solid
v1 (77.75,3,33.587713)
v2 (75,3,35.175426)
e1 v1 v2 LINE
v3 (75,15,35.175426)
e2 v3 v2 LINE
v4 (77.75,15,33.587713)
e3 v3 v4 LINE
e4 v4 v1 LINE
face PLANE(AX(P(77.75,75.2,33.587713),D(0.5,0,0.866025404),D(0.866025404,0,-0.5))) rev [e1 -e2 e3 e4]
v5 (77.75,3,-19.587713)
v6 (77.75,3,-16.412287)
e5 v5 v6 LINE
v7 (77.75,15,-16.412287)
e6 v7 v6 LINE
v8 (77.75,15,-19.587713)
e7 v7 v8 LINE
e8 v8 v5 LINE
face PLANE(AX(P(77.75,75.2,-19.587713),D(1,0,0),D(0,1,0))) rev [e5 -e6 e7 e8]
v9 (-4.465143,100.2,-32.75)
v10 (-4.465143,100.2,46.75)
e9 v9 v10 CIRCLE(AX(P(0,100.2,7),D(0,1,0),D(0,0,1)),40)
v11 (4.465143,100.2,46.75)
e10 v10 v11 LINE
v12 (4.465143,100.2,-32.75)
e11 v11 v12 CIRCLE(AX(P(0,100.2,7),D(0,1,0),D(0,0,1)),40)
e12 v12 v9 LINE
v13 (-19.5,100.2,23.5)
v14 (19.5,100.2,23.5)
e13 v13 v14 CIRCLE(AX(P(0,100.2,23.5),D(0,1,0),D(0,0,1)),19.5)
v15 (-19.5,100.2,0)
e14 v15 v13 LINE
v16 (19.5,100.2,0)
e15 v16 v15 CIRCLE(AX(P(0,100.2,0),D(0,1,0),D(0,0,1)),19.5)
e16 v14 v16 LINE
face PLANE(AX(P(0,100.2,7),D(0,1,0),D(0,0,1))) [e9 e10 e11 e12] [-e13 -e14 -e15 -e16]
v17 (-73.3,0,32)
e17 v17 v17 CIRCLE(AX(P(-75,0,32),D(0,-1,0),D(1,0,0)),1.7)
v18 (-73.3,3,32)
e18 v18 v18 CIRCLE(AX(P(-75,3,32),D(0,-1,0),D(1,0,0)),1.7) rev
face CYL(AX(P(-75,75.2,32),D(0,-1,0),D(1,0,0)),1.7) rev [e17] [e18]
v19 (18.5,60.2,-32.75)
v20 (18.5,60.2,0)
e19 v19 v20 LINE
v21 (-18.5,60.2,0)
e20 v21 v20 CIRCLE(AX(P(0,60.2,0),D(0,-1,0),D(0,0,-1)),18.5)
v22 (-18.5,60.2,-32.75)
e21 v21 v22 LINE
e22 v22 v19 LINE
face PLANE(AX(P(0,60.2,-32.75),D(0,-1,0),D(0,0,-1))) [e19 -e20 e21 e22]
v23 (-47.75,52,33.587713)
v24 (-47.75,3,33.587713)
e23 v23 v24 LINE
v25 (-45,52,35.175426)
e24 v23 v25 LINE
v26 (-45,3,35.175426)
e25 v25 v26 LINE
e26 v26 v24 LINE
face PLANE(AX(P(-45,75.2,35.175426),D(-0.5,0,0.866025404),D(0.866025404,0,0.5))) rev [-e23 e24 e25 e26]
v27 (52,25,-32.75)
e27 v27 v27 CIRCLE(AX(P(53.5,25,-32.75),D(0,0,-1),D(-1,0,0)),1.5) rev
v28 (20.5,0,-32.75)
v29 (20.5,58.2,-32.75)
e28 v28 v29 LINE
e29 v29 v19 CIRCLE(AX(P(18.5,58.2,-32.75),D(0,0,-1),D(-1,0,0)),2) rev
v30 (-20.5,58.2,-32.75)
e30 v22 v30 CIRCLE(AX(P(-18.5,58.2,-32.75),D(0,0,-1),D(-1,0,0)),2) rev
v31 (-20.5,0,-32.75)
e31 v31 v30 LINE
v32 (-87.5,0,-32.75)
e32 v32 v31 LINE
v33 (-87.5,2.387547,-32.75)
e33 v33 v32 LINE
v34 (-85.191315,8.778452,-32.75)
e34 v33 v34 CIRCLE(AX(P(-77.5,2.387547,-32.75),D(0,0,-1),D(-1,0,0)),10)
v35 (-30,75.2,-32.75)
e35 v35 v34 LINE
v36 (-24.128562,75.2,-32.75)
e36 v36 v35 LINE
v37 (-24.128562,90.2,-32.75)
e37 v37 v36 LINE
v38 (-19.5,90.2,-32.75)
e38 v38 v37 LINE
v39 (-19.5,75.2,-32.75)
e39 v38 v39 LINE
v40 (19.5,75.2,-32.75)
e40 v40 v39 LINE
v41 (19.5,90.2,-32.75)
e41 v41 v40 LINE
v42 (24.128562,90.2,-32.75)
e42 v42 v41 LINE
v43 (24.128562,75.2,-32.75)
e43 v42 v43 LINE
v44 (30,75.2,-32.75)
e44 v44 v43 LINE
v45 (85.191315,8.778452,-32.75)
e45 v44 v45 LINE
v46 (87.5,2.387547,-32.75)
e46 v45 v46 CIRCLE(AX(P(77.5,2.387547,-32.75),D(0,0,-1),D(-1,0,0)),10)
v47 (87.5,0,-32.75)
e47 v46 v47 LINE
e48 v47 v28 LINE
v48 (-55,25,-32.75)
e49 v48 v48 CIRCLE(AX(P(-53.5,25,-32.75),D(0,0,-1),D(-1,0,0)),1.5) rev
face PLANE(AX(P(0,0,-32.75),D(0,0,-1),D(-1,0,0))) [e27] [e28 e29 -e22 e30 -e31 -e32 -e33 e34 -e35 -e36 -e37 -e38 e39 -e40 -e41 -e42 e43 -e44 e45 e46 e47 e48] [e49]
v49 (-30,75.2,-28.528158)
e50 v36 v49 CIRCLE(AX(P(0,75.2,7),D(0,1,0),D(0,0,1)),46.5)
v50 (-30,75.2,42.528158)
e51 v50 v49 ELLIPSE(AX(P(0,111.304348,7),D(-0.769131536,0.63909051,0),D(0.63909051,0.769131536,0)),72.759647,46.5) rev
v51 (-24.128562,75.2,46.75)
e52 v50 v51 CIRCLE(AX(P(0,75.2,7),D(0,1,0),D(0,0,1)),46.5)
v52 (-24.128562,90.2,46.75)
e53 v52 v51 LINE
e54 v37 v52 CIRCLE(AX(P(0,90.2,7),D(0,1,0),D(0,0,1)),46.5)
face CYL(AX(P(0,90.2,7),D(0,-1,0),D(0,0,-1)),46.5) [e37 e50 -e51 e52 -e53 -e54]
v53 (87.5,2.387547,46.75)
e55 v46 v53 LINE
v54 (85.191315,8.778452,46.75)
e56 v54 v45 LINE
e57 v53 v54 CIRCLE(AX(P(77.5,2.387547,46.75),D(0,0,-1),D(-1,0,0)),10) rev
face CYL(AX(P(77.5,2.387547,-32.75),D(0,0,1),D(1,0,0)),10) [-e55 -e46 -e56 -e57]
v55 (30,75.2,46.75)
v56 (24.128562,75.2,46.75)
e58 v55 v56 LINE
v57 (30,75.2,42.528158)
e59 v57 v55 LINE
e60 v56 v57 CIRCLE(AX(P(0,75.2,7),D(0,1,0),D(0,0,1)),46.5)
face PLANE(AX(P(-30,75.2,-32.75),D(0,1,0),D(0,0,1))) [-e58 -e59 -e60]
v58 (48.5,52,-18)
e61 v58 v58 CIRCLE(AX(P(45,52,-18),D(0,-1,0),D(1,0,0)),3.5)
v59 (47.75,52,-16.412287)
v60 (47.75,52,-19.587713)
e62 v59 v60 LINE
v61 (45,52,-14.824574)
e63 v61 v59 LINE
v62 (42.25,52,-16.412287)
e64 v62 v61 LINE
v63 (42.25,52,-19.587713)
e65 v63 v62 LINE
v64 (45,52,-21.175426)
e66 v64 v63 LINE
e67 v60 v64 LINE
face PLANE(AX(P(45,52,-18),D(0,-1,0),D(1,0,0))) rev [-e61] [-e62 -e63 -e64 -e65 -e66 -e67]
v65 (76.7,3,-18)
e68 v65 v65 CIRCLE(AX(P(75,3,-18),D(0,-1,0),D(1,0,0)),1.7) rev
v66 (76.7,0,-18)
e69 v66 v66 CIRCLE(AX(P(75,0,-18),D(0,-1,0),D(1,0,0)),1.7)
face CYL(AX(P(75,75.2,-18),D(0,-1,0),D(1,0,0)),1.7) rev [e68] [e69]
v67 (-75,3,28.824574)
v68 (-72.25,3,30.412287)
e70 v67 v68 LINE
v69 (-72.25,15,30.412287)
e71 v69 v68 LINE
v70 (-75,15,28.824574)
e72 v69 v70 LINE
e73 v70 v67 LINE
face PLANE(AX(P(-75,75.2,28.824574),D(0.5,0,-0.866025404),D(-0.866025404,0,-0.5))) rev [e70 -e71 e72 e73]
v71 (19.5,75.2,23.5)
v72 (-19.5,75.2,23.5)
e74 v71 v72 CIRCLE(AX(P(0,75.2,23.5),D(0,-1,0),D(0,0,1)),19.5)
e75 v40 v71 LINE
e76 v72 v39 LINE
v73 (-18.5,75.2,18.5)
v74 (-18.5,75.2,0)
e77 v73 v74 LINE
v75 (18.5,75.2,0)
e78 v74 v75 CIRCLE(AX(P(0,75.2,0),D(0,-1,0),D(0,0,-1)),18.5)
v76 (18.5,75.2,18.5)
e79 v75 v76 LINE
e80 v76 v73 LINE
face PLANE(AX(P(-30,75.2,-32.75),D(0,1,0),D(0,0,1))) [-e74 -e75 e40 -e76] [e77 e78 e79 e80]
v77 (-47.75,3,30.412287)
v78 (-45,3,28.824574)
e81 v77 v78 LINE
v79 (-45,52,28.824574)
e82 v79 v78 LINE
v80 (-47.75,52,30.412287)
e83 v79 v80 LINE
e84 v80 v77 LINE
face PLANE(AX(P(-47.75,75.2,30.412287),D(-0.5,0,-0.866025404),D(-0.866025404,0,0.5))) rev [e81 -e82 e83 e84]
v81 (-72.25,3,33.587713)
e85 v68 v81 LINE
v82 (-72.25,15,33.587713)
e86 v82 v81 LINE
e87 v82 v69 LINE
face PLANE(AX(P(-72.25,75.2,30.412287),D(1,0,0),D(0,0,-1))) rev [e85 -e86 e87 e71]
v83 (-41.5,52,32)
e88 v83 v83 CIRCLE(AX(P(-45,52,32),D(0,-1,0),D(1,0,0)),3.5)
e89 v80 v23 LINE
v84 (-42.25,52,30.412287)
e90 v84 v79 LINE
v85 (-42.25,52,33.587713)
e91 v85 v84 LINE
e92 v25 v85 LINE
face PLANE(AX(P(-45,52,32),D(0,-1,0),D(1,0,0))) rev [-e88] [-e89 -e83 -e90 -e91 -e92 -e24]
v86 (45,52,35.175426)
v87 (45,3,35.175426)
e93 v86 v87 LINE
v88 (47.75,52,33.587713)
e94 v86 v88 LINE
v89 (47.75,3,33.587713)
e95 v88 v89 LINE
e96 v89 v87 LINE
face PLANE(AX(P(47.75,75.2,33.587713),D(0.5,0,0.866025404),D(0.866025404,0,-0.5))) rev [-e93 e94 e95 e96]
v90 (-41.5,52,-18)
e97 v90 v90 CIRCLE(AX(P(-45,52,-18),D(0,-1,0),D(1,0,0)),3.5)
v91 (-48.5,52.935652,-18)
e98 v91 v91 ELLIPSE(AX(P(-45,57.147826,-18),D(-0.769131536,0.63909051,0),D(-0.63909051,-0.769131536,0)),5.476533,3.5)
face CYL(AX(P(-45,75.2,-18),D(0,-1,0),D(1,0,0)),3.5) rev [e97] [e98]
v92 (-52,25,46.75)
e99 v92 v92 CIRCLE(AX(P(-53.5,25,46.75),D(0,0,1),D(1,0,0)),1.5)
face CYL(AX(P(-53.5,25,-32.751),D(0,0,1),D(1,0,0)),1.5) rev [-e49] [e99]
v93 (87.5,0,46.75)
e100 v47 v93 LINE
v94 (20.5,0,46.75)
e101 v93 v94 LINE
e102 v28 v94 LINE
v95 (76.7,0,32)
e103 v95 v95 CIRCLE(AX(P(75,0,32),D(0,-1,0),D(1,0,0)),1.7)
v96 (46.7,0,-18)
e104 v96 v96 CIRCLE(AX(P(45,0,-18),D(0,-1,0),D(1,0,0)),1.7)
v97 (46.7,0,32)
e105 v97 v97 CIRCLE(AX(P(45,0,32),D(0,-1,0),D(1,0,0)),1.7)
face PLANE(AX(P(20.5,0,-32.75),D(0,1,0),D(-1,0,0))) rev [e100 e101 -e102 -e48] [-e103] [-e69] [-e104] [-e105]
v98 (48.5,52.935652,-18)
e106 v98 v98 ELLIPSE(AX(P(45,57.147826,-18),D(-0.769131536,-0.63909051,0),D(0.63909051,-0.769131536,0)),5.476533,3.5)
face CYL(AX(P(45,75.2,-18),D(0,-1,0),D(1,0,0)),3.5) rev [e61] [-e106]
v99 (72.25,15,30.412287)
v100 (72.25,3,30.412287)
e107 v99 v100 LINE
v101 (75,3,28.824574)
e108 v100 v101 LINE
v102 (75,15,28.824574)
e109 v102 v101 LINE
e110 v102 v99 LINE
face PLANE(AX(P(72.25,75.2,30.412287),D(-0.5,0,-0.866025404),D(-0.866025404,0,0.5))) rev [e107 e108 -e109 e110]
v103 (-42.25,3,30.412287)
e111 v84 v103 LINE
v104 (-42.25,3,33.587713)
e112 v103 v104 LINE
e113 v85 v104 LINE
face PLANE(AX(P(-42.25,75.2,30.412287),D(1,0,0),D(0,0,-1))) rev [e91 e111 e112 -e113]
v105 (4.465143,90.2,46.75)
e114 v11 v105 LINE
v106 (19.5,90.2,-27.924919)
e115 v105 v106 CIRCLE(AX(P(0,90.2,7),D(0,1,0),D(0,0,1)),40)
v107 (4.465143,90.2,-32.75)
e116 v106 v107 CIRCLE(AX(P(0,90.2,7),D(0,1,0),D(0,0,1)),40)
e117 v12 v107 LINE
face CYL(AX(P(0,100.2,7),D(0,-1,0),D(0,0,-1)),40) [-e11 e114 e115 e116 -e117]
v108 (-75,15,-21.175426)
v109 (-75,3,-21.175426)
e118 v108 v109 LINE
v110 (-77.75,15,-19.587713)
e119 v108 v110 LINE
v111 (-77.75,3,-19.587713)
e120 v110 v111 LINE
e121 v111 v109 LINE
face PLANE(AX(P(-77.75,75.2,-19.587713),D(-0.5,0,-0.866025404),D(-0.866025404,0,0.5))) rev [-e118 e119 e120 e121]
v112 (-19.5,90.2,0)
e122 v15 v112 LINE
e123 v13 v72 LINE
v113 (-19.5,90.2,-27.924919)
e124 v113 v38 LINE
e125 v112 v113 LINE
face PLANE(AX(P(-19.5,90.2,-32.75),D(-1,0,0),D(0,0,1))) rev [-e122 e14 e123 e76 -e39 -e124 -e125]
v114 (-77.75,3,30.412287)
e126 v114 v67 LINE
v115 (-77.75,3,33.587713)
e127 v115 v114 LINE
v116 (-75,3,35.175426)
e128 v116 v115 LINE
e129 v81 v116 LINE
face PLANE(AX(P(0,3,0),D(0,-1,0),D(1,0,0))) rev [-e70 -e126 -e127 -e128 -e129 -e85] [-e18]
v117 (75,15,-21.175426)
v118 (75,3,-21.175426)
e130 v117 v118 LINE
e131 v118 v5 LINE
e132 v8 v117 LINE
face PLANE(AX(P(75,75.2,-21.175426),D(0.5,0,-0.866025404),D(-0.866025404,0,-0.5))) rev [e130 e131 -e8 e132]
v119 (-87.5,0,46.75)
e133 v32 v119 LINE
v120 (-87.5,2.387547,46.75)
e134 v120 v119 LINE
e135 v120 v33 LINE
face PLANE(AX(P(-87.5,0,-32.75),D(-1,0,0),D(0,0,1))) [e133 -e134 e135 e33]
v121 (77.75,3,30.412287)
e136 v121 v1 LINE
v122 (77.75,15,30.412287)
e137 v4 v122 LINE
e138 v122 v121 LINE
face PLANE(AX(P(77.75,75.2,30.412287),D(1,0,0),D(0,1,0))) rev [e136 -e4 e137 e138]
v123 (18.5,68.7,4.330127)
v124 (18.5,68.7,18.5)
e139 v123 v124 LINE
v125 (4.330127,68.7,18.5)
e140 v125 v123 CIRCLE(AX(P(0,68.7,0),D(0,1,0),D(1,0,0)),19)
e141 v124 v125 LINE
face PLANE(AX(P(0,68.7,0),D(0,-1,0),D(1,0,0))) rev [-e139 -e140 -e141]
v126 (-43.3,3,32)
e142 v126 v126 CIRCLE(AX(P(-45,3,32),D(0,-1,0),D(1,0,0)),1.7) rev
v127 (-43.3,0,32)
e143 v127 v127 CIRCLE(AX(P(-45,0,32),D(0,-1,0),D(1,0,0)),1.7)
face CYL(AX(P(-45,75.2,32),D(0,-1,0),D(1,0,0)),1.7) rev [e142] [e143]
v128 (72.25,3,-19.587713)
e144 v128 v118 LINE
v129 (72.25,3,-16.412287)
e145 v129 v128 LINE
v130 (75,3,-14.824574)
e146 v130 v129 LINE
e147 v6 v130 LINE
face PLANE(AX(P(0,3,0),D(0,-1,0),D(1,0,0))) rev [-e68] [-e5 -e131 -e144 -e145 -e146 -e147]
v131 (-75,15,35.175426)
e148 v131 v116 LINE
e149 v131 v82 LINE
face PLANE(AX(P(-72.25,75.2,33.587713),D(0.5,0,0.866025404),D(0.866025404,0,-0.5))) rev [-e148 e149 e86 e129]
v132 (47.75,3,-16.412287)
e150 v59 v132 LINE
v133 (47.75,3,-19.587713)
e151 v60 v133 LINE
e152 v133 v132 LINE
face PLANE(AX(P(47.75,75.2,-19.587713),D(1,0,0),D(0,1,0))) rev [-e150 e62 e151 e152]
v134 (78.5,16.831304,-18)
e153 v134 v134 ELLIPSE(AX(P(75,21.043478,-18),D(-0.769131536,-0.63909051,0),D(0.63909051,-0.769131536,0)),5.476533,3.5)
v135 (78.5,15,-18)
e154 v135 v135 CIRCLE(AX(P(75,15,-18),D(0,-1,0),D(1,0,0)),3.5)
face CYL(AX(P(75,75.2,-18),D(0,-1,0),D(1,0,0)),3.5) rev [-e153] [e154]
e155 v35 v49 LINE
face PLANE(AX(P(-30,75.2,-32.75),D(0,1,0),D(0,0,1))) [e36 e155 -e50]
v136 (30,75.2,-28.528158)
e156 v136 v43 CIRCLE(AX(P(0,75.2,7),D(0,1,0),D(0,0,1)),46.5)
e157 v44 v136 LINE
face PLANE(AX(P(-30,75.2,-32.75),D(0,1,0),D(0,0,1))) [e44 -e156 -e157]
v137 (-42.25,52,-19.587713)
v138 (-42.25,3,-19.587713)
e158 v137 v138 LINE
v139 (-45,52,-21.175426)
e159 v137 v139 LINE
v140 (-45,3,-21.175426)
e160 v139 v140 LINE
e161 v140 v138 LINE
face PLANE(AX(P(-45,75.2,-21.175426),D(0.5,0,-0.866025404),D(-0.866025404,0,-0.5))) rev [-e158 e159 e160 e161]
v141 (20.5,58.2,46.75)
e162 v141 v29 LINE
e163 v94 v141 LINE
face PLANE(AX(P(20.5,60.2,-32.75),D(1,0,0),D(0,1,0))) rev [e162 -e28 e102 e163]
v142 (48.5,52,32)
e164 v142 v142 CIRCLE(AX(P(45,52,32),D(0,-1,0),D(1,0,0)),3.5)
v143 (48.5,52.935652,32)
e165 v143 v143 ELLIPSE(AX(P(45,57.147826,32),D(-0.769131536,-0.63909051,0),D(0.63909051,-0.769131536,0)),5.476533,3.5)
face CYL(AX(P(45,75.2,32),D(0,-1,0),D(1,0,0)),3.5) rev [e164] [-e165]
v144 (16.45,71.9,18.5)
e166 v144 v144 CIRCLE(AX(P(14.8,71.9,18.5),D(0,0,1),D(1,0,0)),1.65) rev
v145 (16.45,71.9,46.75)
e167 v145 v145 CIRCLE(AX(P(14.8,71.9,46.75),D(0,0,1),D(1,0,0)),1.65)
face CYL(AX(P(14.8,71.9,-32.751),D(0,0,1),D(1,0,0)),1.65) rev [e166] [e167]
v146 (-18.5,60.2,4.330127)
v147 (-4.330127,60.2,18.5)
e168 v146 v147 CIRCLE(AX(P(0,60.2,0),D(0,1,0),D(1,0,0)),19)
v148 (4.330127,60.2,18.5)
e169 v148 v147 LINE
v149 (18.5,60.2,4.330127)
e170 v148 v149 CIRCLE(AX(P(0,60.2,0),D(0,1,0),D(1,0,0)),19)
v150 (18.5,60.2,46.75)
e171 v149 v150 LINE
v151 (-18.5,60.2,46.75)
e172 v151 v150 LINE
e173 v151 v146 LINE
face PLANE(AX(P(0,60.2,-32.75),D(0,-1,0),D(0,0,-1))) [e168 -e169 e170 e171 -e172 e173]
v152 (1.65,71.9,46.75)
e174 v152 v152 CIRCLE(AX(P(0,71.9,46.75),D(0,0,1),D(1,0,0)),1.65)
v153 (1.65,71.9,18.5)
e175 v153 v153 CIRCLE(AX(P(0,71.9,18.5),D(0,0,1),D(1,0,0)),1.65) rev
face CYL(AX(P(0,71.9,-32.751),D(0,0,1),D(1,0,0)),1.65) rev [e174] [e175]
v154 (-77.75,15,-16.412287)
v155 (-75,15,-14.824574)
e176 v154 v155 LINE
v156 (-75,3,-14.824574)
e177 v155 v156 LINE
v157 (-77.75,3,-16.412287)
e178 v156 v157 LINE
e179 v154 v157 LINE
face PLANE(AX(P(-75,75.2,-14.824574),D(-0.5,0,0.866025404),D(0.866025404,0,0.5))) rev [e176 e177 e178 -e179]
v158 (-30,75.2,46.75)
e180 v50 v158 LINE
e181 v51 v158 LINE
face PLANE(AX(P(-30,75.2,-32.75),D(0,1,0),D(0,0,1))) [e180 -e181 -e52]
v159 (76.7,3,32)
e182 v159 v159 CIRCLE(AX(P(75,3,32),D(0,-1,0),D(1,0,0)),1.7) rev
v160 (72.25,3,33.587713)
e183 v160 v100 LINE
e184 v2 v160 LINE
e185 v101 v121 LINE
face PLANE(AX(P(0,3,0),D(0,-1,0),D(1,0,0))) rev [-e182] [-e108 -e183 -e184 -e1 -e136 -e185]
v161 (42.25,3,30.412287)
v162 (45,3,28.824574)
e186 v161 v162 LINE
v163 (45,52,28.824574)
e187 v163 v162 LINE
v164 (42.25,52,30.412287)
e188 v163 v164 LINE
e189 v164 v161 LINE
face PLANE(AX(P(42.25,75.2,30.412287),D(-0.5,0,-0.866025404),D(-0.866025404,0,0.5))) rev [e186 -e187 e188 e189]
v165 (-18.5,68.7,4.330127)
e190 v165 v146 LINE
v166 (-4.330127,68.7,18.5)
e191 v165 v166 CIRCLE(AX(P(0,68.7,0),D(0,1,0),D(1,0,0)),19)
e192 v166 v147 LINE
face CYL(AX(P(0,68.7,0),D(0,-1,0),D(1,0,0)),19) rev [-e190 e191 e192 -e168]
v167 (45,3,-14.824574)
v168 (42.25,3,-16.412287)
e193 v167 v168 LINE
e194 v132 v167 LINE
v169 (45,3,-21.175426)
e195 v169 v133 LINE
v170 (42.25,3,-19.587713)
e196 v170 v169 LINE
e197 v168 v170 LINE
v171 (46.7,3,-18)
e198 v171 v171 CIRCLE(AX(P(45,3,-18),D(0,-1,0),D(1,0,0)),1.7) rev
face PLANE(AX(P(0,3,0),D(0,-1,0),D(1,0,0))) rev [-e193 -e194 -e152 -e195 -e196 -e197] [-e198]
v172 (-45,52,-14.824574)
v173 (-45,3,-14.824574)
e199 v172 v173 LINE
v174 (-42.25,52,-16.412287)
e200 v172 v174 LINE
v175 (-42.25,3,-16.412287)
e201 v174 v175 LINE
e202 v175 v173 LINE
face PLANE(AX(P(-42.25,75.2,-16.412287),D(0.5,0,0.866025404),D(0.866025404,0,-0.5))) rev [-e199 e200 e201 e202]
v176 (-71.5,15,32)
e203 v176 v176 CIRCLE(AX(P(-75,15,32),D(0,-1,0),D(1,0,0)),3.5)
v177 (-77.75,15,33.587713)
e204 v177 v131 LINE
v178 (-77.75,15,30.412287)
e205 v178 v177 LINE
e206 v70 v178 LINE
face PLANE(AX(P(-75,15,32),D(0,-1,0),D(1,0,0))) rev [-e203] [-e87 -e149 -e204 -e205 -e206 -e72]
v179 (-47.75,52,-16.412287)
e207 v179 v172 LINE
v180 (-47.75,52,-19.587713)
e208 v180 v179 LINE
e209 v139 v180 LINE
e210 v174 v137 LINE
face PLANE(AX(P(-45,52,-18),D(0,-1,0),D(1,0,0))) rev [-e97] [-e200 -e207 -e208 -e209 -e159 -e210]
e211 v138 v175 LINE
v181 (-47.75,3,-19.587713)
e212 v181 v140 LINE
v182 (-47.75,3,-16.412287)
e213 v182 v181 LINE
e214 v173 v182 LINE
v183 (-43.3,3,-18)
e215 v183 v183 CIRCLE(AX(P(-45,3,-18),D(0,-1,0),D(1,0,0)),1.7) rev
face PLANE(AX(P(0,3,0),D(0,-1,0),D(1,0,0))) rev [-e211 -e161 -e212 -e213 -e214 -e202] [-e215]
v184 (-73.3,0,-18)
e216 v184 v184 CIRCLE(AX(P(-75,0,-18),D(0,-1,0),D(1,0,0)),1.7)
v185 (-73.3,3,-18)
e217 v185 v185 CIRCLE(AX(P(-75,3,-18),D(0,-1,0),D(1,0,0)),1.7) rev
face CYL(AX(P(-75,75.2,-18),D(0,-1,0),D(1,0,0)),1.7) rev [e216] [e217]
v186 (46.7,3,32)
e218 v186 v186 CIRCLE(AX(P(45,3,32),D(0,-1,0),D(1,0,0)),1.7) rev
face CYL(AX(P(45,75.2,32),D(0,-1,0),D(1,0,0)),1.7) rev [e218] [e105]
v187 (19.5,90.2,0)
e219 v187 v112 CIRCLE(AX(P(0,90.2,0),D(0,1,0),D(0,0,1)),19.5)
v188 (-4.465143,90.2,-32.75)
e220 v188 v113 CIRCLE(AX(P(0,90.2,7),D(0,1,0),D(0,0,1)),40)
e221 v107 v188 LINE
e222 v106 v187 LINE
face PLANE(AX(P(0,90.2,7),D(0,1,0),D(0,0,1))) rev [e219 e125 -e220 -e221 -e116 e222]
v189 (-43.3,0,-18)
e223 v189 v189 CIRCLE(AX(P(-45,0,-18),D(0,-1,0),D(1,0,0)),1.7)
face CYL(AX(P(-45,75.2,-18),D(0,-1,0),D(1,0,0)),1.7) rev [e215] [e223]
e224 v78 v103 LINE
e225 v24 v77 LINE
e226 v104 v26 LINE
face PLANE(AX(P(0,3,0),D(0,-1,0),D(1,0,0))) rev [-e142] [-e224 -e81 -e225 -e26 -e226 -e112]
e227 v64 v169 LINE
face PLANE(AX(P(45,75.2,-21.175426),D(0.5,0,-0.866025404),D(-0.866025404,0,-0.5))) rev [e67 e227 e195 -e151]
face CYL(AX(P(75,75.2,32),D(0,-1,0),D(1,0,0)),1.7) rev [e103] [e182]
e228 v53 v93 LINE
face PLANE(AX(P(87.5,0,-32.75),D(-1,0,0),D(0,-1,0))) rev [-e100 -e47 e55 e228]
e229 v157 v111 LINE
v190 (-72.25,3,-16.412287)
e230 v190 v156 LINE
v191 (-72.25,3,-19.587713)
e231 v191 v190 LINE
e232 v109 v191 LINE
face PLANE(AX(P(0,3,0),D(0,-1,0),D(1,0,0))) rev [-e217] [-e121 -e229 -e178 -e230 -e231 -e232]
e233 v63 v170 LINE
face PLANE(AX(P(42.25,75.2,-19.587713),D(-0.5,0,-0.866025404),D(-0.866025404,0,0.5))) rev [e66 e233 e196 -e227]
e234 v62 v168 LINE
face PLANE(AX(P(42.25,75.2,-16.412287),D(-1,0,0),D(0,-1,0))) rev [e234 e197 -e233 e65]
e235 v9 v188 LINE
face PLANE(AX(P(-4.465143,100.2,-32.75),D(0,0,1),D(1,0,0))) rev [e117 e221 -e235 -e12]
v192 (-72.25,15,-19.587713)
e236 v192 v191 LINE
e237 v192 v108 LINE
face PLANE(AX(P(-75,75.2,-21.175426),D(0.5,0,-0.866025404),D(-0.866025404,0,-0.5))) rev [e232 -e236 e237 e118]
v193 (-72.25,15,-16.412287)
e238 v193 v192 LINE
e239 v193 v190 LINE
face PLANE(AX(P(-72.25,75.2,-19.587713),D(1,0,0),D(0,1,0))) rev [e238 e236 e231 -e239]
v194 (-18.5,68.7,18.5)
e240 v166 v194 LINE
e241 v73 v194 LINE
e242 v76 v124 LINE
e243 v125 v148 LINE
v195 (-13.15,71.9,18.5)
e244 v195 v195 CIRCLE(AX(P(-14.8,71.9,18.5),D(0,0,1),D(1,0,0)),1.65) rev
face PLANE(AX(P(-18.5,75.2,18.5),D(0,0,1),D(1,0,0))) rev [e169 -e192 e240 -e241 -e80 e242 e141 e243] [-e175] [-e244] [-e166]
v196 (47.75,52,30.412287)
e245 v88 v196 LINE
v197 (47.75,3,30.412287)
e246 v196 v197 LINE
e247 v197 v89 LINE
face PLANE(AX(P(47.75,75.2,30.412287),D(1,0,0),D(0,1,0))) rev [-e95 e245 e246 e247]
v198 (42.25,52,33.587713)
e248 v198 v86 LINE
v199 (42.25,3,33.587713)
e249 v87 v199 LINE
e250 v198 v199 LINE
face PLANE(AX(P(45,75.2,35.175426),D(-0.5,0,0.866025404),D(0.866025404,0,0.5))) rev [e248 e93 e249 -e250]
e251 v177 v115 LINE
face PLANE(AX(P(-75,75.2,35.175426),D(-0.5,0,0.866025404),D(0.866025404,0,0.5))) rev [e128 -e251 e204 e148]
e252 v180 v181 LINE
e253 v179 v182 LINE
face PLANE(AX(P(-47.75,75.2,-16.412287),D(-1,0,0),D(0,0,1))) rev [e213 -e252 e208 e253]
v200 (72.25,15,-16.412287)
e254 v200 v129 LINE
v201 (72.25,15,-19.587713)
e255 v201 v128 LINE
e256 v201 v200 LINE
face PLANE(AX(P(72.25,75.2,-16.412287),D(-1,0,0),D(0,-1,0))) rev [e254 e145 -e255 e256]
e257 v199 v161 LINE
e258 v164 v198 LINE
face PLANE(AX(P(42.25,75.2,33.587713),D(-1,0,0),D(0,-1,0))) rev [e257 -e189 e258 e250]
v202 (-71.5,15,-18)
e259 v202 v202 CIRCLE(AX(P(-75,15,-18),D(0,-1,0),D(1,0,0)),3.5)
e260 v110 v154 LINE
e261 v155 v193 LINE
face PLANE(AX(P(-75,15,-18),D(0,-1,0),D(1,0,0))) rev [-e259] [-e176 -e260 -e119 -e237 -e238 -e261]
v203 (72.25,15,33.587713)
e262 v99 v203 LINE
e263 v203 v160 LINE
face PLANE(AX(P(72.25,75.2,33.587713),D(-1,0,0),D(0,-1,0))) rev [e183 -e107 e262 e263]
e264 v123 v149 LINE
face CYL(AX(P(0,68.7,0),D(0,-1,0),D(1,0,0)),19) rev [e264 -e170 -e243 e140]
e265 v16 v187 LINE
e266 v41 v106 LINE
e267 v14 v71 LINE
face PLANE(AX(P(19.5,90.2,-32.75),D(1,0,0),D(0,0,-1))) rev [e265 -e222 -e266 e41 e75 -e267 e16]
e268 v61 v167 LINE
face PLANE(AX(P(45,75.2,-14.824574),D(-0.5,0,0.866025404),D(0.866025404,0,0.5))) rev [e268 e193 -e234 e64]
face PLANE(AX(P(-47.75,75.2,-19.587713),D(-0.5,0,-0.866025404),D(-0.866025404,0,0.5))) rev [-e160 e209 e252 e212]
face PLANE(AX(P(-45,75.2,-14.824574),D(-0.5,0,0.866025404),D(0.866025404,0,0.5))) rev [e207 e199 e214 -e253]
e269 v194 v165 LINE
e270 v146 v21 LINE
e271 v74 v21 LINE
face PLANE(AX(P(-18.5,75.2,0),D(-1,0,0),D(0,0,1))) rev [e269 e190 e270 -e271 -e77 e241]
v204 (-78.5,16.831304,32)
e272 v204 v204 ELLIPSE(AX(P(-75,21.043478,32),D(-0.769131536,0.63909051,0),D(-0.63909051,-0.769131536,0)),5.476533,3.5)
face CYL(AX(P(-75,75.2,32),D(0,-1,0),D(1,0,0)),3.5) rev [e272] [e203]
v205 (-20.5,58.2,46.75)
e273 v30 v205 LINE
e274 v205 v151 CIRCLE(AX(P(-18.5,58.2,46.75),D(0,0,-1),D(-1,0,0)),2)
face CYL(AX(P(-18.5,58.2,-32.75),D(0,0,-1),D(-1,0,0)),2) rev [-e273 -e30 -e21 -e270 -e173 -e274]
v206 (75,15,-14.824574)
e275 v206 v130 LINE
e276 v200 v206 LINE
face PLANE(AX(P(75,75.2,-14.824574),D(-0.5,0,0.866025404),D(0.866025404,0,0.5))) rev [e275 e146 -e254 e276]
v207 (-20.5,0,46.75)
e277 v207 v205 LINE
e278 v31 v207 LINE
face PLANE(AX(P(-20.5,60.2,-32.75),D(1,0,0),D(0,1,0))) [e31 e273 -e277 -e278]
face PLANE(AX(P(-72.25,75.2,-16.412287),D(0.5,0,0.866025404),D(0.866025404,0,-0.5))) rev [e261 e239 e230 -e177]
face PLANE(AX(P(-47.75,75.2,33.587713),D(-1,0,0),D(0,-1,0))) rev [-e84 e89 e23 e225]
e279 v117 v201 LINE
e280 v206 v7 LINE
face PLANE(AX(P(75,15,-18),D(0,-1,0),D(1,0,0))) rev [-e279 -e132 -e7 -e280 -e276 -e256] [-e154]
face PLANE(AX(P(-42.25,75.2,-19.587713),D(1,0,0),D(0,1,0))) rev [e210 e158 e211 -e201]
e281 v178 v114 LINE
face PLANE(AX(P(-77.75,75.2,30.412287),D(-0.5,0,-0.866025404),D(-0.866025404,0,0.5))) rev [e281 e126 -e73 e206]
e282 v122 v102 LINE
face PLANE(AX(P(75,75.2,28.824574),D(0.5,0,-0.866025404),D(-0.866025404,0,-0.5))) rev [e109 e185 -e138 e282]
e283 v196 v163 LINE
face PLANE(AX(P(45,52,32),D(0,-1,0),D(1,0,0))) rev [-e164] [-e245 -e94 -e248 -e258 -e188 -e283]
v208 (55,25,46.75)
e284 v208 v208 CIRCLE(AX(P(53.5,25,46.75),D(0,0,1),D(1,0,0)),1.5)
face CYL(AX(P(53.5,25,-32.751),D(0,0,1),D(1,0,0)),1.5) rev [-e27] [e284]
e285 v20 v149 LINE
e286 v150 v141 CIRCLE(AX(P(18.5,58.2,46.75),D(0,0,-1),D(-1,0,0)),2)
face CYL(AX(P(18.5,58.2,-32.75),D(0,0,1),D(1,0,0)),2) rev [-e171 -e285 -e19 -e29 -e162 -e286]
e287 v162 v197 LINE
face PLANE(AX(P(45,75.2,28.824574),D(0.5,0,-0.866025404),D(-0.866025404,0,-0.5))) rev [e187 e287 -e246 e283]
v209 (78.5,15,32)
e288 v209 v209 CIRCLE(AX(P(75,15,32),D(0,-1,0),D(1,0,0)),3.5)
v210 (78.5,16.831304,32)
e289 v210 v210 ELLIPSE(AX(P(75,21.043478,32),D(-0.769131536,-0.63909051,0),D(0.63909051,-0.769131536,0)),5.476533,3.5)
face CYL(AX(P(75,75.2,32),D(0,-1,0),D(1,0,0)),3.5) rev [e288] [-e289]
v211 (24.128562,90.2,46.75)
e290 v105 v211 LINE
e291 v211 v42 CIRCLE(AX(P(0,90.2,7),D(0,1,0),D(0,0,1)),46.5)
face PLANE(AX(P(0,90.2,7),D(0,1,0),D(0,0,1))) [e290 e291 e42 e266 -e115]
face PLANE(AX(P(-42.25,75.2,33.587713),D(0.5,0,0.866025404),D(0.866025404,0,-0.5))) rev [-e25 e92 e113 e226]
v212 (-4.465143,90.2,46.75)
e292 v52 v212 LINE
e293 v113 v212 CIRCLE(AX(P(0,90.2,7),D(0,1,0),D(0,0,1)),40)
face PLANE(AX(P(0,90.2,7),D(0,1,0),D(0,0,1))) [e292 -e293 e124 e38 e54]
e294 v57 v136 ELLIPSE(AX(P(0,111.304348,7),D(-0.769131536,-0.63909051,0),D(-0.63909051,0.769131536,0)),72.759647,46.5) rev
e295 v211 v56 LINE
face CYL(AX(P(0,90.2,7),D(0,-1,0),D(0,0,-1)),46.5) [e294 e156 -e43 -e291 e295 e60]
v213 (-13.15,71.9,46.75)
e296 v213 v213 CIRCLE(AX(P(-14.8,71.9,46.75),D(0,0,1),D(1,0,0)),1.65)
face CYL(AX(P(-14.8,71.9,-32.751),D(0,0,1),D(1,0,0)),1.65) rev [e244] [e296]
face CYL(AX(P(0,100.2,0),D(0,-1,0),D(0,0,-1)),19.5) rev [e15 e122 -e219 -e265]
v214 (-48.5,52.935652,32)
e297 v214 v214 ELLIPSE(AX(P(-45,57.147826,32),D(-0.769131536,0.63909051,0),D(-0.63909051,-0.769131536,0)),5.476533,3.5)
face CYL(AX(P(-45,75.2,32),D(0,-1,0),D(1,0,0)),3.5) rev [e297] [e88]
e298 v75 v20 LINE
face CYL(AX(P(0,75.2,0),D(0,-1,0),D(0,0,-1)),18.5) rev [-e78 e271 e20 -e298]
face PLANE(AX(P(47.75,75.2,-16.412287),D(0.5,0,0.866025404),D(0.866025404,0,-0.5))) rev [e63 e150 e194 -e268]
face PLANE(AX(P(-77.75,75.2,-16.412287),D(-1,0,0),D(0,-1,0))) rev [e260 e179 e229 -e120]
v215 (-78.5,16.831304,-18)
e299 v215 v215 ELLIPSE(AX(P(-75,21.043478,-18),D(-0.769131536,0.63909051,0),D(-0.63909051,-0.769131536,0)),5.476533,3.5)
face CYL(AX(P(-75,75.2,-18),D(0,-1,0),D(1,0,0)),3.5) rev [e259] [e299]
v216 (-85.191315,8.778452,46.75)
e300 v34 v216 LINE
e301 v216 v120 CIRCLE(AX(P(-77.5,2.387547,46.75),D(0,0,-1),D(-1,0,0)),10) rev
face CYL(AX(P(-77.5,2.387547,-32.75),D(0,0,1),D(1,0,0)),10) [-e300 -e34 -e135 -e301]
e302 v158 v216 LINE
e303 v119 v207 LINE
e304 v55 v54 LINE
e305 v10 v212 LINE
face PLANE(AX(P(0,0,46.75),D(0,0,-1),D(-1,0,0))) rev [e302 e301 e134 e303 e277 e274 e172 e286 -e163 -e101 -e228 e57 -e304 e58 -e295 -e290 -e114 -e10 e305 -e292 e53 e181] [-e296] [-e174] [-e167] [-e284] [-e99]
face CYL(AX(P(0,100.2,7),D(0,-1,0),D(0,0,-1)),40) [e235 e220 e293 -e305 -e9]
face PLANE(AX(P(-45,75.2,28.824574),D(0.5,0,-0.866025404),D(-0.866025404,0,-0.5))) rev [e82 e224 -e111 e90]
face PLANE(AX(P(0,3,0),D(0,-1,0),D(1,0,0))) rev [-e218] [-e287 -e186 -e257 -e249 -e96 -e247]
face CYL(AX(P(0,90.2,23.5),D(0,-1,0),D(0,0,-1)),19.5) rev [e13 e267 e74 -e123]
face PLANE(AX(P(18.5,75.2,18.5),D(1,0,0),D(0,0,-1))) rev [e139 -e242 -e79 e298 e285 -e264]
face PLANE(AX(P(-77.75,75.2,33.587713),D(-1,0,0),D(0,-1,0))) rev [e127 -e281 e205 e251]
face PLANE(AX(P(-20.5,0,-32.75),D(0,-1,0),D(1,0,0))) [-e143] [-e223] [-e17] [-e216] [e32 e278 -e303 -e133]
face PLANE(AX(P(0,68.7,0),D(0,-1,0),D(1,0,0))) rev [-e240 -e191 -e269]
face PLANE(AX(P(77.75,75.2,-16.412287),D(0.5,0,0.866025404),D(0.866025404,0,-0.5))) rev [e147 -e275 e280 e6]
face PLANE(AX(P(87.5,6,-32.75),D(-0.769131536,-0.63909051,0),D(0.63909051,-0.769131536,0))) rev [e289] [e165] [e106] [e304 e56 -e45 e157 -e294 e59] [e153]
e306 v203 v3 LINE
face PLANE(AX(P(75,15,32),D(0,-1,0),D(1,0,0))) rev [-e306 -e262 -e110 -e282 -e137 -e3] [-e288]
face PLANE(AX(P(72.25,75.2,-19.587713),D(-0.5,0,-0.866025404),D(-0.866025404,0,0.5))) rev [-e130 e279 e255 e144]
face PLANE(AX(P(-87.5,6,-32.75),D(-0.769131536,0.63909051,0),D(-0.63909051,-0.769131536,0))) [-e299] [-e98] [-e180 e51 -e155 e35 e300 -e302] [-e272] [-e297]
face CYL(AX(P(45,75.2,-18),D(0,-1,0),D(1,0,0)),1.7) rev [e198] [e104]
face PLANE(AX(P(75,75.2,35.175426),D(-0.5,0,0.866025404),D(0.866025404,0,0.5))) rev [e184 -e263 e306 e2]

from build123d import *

# Parameters (mm, degrees)
BOSS_EXTRUDE2_START   = -32.75
BOSS_EXTRUDE2_DEPTH   = 79.5
CUT_EXTRUDE1_DEPTH    = 117.042459902
SKETCH6_R             = 1.7
CUT_EXTRUDE2_DEPTH    = 125.486354674
CUT_EXTRUDE3_START    = -3
CUT_EXTRUDE3_DEPTH    = 122.486354674
CUT_EXTRUDE8_START    = -15
SKETCH17_R            = 3.5
CUT_EXTRUDE8_DEPTH    = 110.486354674
CUT_EXTRUDE9_START    = -52
SKETCH18_R            = 3.5
CUT_EXTRUDE9_DEPTH    = 73.486354674
FILLET1_R             = 2
FILLET3_R             = 10
CUT_EXTRUDE5_REACH    = 142.113
SKETCH10_R            = 1.65
CUT_EXTRUDE6_REACH    = 142.113
SKETCH11_R            = 1.5
BOSS_EXTRUDE4_DEPTH   = 8.5
BOSS_EXTRUDE5_START   = -66.421548224
BOSS_EXTRUDE5_DEPTH   = 81.421548224
BOSS_EXTRUDE5_2_DEPTH = 15
BOSS_EXTRUDE6_DEPTH   = 10


with BuildPart() as part:
    # Sketch3 → Boss-Extrude2 (new body)
    with BuildSketch(Plane.XY.offset(BOSS_EXTRUDE2_START)):
        Polygon((-20.5, 0), (-87.5, 0), (-87.5, 6), (-30, 75.2), (0, 75.2), (0, 60.2), (-20.5, 60.2), align=None)
    boss_extrude2 = extrude(amount=BOSS_EXTRUDE2_DEPTH)

    # Mirror1: Boss-Extrude2 across plane
    add(boss_extrude2.mirror(Plane(origin=(0, 75.2, -32.75), x_dir=(0, 0, 1), z_dir=(1, 0, 0))))

    # Sketch4 → Cut-Extrude1 (cut, through all)
    with BuildSketch(Plane.XZ.offset(-60.2)):
        with BuildLine():
            Line((-18.5, 0), (-18.5, 18.5))
            Line((-18.5, 18.5), (18.5, 18.5))
            Line((18.5, 18.5), (18.5, 0))
            ThreePointArc((18.5, 0), (0, -18.5), (-18.5, 0))
        make_face()
    extrude(amount=-CUT_EXTRUDE1_DEPTH, mode=Mode.SUBTRACT)

    # Sketch6 → Cut-Extrude2 (cut, through all)
    with BuildSketch(Plane.XZ):
        with Locations((-75, 32)):
            Circle(SKETCH6_R)
        with Locations((-75, -18)):
            Circle(SKETCH6_R)
        with Locations((75, 32)):
            Circle(SKETCH6_R)
        with Locations((75, -18)):
            Circle(SKETCH6_R)
        with Locations((-45, 32)):
            Circle(SKETCH6_R)
        with Locations((-45, -18)):
            Circle(SKETCH6_R)
        with Locations((45, 32)):
            Circle(SKETCH6_R)
        with Locations((45, -18)):
            Circle(SKETCH6_R)
    extrude(amount=-CUT_EXTRUDE2_DEPTH, mode=Mode.SUBTRACT)

    # Sketch7 → Cut-Extrude3 (cut, through all)
    with BuildSketch(Plane.XZ.offset(CUT_EXTRUDE3_START)):
        Polygon((-75, 35.175426481), (-77.75, 33.58771324), (-77.75, 30.41228676), (-75, 28.824573519), (-72.25, 30.41228676), (-72.25, 33.58771324), align=None)
        Polygon((-75, -14.824573519), (-77.75, -16.41228676), (-77.75, -19.58771324), (-75, -21.175426481), (-72.25, -19.58771324), (-72.25, -16.41228676), align=None)
        Polygon((-45, -14.824573519), (-47.75, -16.41228676), (-47.75, -19.58771324), (-45, -21.175426481), (-42.25, -19.58771324), (-42.25, -16.41228676), align=None)
        Polygon((-45, 35.175426481), (-47.75, 33.58771324), (-47.75, 30.41228676), (-45, 28.824573519), (-42.25, 30.41228676), (-42.25, 33.58771324), align=None)
        Polygon((45, -14.824573519), (42.25, -16.41228676), (42.25, -19.58771324), (45, -21.175426481), (47.75, -19.58771324), (47.75, -16.41228676), align=None)
        Polygon((75, -14.824573519), (72.25, -16.41228676), (72.25, -19.58771324), (75, -21.175426481), (77.75, -19.58771324), (77.75, -16.41228676), align=None)
        Polygon((75, 35.175426481), (72.25, 33.58771324), (72.25, 30.41228676), (75, 28.824573519), (77.75, 30.41228676), (77.75, 33.58771324), align=None)
        Polygon((45, 35.175426481), (42.25, 33.58771324), (42.25, 30.41228676), (45, 28.824573519), (47.75, 30.41228676), (47.75, 33.58771324), align=None)
    extrude(amount=-CUT_EXTRUDE3_DEPTH, mode=Mode.SUBTRACT)

    # Sketch17 → Cut-Extrude8 (cut, through all)
    with BuildSketch(Plane.XZ.offset(CUT_EXTRUDE8_START)):
        with Locations((-75, 32)):
            Circle(SKETCH17_R)
        with Locations((-75, -18)):
            Circle(SKETCH17_R)
        with Locations((75, 32)):
            Circle(SKETCH17_R)
        with Locations((75, -18)):
            Circle(SKETCH17_R)
    extrude(amount=-CUT_EXTRUDE8_DEPTH, mode=Mode.SUBTRACT)

    # Sketch18 → Cut-Extrude9 (cut, through all)
    with BuildSketch(Plane.XZ.offset(CUT_EXTRUDE9_START)):
        with Locations((-45, 32)):
            Circle(SKETCH18_R)
        with Locations((-45, -18)):
            Circle(SKETCH18_R)
        with Locations((45, -18)):
            Circle(SKETCH18_R)
        with Locations((45, 32)):
            Circle(SKETCH18_R)
    extrude(amount=-CUT_EXTRUDE9_DEPTH, mode=Mode.SUBTRACT)

    # Fillet1
    fillet1_edges = [part.edges().sort_by_distance(p)[0] for p in [
        (-20.5, 60.2, 7),
        (20.5, 60.2, 7),
    ]]
    fillet(fillet1_edges, radius=FILLET1_R - 0.0001)  # a hair under: the kernel refuses the full size

    # Fillet3
    fillet3_edges = [part.edges().sort_by_distance(p)[0] for p in [
        (-87.5, 6, 7),
        (87.5, 6, 7),
    ]]
    fillet(fillet3_edges, radius=FILLET3_R)

    # Sketch10 → Cut-Extrude5 (cut, up to next)
    with BuildSketch(Plane.XY.offset(46.75), mode=Mode.PRIVATE) as cut_extrude5_sk1:
        with Locations((0, 71.9)):
            Circle(SKETCH10_R)
    cut_extrude5_tool1 = extrude(cut_extrude5_sk1.sketch, amount=-CUT_EXTRUDE5_REACH, mode=Mode.PRIVATE) & part.part
    # Sketch10 → Cut-Extrude5 (cut, up to next)
    with BuildSketch(Plane.XY.offset(46.75), mode=Mode.PRIVATE) as cut_extrude5_sk2:
        with Locations((-14.8, 71.9)):
            Circle(SKETCH10_R)
    cut_extrude5_tool2 = extrude(cut_extrude5_sk2.sketch, amount=-CUT_EXTRUDE5_REACH, mode=Mode.PRIVATE) & part.part
    # Sketch10 → Cut-Extrude5 (cut, up to next)
    with BuildSketch(Plane.XY.offset(46.75), mode=Mode.PRIVATE) as cut_extrude5_sk3:
        with Locations((14.8, 71.9)):
            Circle(SKETCH10_R)
    cut_extrude5_tool3 = extrude(cut_extrude5_sk3.sketch, amount=-CUT_EXTRUDE5_REACH, mode=Mode.PRIVATE) & part.part
    add(cut_extrude5_tool1.solids().sort_by_distance((0, 71.9, 46.75))[0], mode=Mode.SUBTRACT)
    add(cut_extrude5_tool2.solids().sort_by_distance((-14.8, 71.9, 46.75))[0], mode=Mode.SUBTRACT)
    add(cut_extrude5_tool3.solids().sort_by_distance((14.8, 71.9, 46.75))[0], mode=Mode.SUBTRACT)

    # Sketch11 → Cut-Extrude6 (cut, up to next)
    with BuildSketch(Plane.XY.offset(46.75), mode=Mode.PRIVATE) as cut_extrude6_sk1:
        with Locations((-53.5, 25)):
            Circle(SKETCH11_R)
    cut_extrude6_tool1 = extrude(cut_extrude6_sk1.sketch, amount=-CUT_EXTRUDE6_REACH, mode=Mode.PRIVATE) & part.part
    # Sketch11 → Cut-Extrude6 (cut, up to next)
    with BuildSketch(Plane.XY.offset(46.75), mode=Mode.PRIVATE) as cut_extrude6_sk2:
        with Locations((53.5, 25)):
            Circle(SKETCH11_R)
    cut_extrude6_tool2 = extrude(cut_extrude6_sk2.sketch, amount=-CUT_EXTRUDE6_REACH, mode=Mode.PRIVATE) & part.part
    add(cut_extrude6_tool1.solids().sort_by_distance((-53.5, 25, 46.75))[0], mode=Mode.SUBTRACT)
    add(cut_extrude6_tool2.solids().sort_by_distance((53.5, 25, 46.75))[0], mode=Mode.SUBTRACT)

    # Sketch13 → Boss-Extrude4 (add)
    with BuildSketch(Plane.XZ.offset(-60.2)):
        with BuildLine():
            Line((-18.5, 18.5), (-18.5, 4.330127019))
            ThreePointArc((-18.5, 4.330127019), (-13.435028843, 13.435028843), (-4.330127019, 18.5))
            Line((-4.330127019, 18.5), (-18.5, 18.5))
        make_face()
        with BuildLine():
            Line((18.5, 18.5), (4.330127019, 18.5))
            ThreePointArc((4.330127019, 18.5), (13.435028843, 13.435028843), (18.5, 4.330127019))
            Line((18.5, 4.330127019), (18.5, 18.5))
        make_face()
    extrude(amount=-BOSS_EXTRUDE4_DEPTH)

    # Boss-Extrude5: read off the stored shape, not the designer's step
    # Boss-Extrude5 outline → Boss-Extrude5 (add)
    with BuildSketch(Plane(origin=(0, 75.2, 0), x_dir=(1, 0, 0), z_dir=(0, 1, 0)).offset(BOSS_EXTRUDE5_START)):
        with BuildLine():
            Line((-30, -42.528157847), (-30, 28.528157847))
            ThreePointArc((-30, 28.528157847), (-46.5, -7), (-30, -42.528157847))
        make_face()
        with BuildLine():
            ThreePointArc((30, -42.528157847), (46.5, -7), (30, 28.528157847))
            Line((30, 28.528157847), (30, -42.528157847))
        make_face()
    extrude(amount=BOSS_EXTRUDE5_DEPTH)

    # Boss-Extrude5 2 outline → Boss-Extrude5 2 (add)
    with BuildSketch(Plane(origin=(0, 75.2, 0), x_dir=(1, 0, 0), z_dir=(0, 1, 0))):
        with BuildLine():
            Line((-19.5, 32.75), (-24.128561913, 32.75))
            ThreePointArc((-24.128561913, 32.75), (-27.146478436, 30.753393338), (-30, 28.528157847))
            Line((-30, 28.528157847), (-30, -42.528157847))
            ThreePointArc((-30, -42.528157847), (-27.146478436, -44.753393338), (-24.128561913, -46.75))
            Line((-24.128561913, -46.75), (24.128561913, -46.75))
            ThreePointArc((24.128561913, -46.75), (27.146478436, -44.753393338), (30, -42.528157847))
            Line((30, -42.528157847), (30, 28.528157847))
            ThreePointArc((30, 28.528157847), (27.146478436, 30.753393338), (24.128561913, 32.75))
            Line((24.128561913, 32.75), (19.5, 32.75))
            Line((19.5, 32.75), (19.5, -23.5))
            ThreePointArc((19.5, -23.5), (0, -43), (-19.5, -23.5))
            Line((-19.5, -23.5), (-19.5, 32.75))
        make_face()
    extrude(amount=BOSS_EXTRUDE5_2_DEPTH)

    # Sketch15 → Boss-Extrude6 (add)
    with BuildSketch(Plane(origin=(0, 90.2, 0), x_dir=(1, 0, 0), z_dir=(0, 1, 0))):
        with BuildLine():
            Line((-4.465142775, 32.75), (4.465142775, 32.75))
            ThreePointArc((4.465142775, 32.75), (40, -7), (4.465142775, -46.75))
            Line((4.465142775, -46.75), (-4.465142775, -46.75))
            ThreePointArc((-4.465142775, -46.75), (-40, -7), (-4.465142775, 32.75))
        make_face()
        with BuildLine():
            Line((19.5, -23.5), (19.5, 0))
            ThreePointArc((19.5, 0), (0, 19.5), (-19.5, 0))
            Line((-19.5, 0), (-19.5, -23.5))
            ThreePointArc((-19.5, -23.5), (0, -43), (19.5, -23.5))
        make_face(mode=Mode.SUBTRACT)
    extrude(amount=BOSS_EXTRUDE6_DEPTH)


solid = part.part
